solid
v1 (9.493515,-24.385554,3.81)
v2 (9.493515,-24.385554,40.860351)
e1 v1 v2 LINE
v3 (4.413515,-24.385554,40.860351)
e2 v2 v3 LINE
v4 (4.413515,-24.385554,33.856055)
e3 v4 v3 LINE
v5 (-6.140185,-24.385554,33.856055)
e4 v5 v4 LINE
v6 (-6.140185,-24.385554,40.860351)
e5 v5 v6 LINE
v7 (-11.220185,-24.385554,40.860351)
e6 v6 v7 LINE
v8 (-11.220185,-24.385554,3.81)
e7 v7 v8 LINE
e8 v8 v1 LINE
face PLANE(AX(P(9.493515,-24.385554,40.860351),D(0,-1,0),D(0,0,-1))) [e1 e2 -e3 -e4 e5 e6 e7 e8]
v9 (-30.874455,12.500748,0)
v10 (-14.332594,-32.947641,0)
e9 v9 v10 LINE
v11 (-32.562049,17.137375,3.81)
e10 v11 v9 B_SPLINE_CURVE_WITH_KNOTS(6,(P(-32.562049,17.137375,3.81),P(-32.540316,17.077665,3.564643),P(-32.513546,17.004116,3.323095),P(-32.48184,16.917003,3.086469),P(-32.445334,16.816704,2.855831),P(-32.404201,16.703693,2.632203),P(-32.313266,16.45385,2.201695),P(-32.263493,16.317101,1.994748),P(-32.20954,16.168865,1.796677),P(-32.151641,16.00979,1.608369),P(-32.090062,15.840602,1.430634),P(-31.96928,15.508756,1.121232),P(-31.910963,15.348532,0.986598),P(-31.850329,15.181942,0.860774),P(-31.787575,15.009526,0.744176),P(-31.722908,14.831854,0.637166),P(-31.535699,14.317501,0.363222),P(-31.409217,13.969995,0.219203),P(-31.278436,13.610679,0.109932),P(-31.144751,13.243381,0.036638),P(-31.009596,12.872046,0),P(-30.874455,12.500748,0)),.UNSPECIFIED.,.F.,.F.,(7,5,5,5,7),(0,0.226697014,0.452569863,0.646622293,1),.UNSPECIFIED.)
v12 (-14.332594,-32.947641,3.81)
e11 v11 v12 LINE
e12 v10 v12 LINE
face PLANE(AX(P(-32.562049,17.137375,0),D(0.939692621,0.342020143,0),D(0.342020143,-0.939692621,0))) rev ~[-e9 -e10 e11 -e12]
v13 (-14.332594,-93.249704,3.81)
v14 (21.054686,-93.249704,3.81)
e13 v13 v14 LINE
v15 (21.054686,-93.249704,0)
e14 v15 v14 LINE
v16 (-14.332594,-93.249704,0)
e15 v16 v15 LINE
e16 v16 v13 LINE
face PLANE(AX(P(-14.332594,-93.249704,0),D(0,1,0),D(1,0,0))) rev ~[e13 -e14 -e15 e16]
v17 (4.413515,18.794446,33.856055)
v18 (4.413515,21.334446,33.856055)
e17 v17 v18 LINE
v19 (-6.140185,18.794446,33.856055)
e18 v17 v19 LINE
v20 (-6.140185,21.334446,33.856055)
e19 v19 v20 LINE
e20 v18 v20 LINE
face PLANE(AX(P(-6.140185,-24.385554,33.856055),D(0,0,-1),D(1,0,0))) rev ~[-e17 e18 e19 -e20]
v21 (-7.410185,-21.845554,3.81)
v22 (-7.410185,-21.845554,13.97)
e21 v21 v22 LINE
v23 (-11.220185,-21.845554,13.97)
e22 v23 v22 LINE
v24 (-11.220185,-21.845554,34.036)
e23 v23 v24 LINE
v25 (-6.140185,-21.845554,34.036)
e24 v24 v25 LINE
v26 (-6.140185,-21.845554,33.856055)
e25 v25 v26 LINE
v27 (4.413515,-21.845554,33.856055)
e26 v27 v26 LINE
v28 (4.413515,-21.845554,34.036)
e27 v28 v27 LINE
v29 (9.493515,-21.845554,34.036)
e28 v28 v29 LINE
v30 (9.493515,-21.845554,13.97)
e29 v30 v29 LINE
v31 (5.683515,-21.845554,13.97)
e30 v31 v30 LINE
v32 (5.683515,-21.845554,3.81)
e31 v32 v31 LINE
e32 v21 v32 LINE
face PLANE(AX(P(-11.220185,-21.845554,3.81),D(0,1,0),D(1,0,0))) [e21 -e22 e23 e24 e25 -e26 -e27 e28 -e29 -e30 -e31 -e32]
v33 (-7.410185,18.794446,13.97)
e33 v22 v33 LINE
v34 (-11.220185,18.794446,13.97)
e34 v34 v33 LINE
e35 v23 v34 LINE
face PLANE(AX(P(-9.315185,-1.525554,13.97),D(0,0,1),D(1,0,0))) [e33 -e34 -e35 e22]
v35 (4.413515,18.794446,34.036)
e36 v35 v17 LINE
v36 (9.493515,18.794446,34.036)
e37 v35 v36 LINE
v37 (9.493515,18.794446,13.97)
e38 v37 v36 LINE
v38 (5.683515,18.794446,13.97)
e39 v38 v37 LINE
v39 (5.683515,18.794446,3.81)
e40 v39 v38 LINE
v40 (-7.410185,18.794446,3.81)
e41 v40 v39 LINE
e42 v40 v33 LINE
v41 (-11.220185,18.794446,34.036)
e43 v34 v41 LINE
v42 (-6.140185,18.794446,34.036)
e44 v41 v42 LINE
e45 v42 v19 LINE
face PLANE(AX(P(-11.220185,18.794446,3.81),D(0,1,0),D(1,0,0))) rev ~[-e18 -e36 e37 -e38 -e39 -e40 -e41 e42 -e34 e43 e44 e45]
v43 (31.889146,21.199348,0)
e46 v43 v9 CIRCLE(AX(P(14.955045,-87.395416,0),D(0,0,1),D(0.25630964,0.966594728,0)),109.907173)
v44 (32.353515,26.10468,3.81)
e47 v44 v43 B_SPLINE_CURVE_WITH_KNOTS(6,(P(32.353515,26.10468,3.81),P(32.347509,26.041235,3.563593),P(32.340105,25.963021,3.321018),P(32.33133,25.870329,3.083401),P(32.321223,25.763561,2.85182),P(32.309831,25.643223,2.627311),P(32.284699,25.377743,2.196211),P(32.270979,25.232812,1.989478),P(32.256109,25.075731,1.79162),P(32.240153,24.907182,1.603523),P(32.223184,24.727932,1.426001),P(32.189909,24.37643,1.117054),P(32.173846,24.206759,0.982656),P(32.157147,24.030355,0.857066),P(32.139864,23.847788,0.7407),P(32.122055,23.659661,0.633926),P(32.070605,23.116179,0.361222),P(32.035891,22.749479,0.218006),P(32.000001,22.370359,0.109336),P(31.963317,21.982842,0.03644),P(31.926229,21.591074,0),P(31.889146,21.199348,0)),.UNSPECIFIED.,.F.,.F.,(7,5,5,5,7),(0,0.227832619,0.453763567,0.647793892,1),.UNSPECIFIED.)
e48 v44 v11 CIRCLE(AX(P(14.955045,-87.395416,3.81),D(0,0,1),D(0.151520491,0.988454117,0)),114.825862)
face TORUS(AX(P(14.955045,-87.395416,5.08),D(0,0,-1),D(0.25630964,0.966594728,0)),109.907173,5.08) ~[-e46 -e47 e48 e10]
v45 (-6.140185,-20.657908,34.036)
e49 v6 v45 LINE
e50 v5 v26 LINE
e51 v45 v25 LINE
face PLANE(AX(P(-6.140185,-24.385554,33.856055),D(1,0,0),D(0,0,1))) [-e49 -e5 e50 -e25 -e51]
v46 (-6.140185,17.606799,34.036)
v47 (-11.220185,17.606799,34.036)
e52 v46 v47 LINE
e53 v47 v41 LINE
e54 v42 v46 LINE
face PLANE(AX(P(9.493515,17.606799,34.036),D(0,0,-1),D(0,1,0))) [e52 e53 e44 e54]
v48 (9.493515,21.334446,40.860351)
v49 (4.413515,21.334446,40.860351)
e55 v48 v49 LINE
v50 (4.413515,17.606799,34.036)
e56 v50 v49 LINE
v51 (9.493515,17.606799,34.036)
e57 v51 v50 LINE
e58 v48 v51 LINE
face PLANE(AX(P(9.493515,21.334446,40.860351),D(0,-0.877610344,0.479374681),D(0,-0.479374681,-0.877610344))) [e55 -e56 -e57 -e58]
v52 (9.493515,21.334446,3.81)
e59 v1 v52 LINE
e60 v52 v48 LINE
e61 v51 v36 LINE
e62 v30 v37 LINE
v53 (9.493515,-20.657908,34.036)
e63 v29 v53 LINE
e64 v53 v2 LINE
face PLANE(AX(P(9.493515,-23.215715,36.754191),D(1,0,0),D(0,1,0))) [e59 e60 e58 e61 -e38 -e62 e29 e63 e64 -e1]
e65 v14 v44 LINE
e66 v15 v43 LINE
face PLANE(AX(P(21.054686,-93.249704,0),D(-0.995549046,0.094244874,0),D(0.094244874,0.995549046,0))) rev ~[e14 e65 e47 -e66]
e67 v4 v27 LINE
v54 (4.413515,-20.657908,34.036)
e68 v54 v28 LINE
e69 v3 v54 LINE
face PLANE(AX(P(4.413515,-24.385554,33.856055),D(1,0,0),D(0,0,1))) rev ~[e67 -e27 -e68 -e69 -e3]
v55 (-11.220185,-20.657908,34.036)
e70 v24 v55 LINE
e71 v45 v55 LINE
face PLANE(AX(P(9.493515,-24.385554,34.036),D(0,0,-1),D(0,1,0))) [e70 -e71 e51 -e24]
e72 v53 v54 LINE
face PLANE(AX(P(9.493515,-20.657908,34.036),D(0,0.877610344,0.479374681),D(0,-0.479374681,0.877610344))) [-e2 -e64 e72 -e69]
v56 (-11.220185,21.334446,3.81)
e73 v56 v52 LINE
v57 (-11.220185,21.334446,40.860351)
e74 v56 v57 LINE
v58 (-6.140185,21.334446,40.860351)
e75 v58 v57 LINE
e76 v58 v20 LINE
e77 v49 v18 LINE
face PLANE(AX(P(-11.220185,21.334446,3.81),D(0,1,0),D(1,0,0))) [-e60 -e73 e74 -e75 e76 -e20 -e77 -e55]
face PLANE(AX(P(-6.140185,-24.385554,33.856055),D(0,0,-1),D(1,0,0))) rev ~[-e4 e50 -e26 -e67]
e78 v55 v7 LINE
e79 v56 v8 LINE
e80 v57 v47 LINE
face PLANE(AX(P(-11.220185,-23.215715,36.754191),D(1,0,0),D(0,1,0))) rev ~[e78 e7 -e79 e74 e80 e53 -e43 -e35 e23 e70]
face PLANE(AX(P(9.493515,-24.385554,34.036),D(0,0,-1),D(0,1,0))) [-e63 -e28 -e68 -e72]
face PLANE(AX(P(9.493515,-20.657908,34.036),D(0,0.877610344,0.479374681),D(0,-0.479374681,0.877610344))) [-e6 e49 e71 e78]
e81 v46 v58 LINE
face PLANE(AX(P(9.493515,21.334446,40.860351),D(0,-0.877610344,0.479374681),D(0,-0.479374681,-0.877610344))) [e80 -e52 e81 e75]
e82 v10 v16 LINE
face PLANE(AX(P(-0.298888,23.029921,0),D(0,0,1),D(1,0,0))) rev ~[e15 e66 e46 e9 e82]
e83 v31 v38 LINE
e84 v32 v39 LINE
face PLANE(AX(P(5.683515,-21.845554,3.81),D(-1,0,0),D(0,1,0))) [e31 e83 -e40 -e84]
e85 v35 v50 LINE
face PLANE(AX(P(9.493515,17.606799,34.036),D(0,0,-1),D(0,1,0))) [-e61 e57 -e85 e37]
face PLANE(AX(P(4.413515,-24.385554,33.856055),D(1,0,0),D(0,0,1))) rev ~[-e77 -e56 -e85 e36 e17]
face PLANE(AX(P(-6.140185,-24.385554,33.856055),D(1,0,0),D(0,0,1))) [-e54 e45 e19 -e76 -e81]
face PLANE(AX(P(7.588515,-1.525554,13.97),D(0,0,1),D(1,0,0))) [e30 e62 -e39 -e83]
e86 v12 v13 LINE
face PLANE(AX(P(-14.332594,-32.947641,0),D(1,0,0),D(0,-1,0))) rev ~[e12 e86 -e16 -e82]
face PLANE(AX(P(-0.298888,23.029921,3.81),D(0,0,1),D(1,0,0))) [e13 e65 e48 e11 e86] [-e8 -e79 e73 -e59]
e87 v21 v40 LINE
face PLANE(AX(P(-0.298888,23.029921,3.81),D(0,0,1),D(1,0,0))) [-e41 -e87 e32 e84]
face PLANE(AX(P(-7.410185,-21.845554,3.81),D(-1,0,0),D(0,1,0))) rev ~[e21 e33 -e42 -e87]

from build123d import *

# Parameters (mm, degrees)
F1_DEPTH    = 3.81
F3_T2_ANGLE = 45.4323000541
F2_W        = 20.7137
F2_H        = 2.54
F4_DEPTH    = 30.226
F8_DEPTH    = 20.7137
F9_W        = 10.5537
F9_H        = 7.0042966513
F10_DEPTH   = 51.8170001
F6_W        = 3.81
F6_H        = 40.64
F11_DEPTH   = 10.16


# Not quite as in the source:
# - a fillet or chamfer that OpenCascade refuses, or shapes differently, is made with other operations: its cross-section is extruded or revolved along the edge and cut away or added


with BuildPart() as f1:
    # F0 (on Top) → F1 (new body)
    with BuildSketch(Plane.XY):
        with BuildLine():
            ThreePointArc((32.3535154368, 26.1046796118), (-0.7575616132, 26.3503201986), (-32.5620487044, 17.1373747646))
            Line((-32.5620487044, 17.1373747646), (32.3535154368, 26.1046796118))
        make_face()
        Polygon((32.3535154368, 26.1046796118), (-32.5620487044, 17.1373747646), (-14.3325939581, -32.94764052), (-14.3325939581, -93.2497044648), (21.0546860419, -93.2497044648), align=None)
    extrude(amount=F1_DEPTH)

    # F3: fillet of radius 5.08 on 1 edges, made by hand

    # F3_s1 → F3_t2 (revolve, cut)
    with BuildSketch(Plane(origin=(35.6245782938, -9.4464852648, 0), x_dir=(0, 0, 1), z_dir=(0.966594728, -0.2563096405, 0))):
        with BuildLine():
            ThreePointArc((3.81, -34.1830353327), (1.0639073716, -32.3751984564), (0, -29.2643464831))
            Line((0, -29.2643464831), (0, -34.1830353327))
            Line((0, -34.1830353327), (3.81, -34.1830353327))
        make_face()
    revolve(axis=Axis((14.9550445097, -87.395415893, 0), (0, 0, 1)), revolution_arc=F3_T2_ANGLE, mode=Mode.SUBTRACT)

    # F2 (on face) → F4 (join)
    with BuildSketch(Plane.XY.offset(3.81)):
        with Locations((-0.8633345632, 20.0644456113)):
            Rectangle(F2_W, F2_H)
        with Locations((-0.8633345632, -23.1155543887)):
            Rectangle(F2_W, F2_H)
    extrude(amount=F4_DEPTH)

    # F7 (on face) → F8 (join)
    with BuildSketch(Plane.YZ.offset(9.4935154368)):
        Polygon((-24.3855543887, 40.8603511751), (-24.3855543887, 34.036), (-21.8455543887, 34.036), (-20.6579078442, 34.036), align=None)
        Polygon((17.6067990667, 34.036), (21.3344456113, 34.036), (21.3344456113, 40.8603511751), align=None)
    extrude(amount=-F8_DEPTH)

    # F9 (on face) → F10 (cut, through all)
    with BuildSketch(Plane.XZ.offset(24.3855543887)):
        with Locations((-0.8633345632, 37.3582028494)):
            Rectangle(F9_W, F9_H)
    extrude(amount=-F10_DEPTH, mode=Mode.SUBTRACT)

    # F6 (on face) → F11 (join)
    with BuildSketch(Plane.XY.offset(3.81)):
        with Locations((7.5885154368, -1.5255543887)):
            Rectangle(F6_W, F6_H)
        with Locations((-9.3151845632, -1.5255543887)):
            Rectangle(F6_W, F6_H)
    extrude(amount=F11_DEPTH)


solid = f1.part
